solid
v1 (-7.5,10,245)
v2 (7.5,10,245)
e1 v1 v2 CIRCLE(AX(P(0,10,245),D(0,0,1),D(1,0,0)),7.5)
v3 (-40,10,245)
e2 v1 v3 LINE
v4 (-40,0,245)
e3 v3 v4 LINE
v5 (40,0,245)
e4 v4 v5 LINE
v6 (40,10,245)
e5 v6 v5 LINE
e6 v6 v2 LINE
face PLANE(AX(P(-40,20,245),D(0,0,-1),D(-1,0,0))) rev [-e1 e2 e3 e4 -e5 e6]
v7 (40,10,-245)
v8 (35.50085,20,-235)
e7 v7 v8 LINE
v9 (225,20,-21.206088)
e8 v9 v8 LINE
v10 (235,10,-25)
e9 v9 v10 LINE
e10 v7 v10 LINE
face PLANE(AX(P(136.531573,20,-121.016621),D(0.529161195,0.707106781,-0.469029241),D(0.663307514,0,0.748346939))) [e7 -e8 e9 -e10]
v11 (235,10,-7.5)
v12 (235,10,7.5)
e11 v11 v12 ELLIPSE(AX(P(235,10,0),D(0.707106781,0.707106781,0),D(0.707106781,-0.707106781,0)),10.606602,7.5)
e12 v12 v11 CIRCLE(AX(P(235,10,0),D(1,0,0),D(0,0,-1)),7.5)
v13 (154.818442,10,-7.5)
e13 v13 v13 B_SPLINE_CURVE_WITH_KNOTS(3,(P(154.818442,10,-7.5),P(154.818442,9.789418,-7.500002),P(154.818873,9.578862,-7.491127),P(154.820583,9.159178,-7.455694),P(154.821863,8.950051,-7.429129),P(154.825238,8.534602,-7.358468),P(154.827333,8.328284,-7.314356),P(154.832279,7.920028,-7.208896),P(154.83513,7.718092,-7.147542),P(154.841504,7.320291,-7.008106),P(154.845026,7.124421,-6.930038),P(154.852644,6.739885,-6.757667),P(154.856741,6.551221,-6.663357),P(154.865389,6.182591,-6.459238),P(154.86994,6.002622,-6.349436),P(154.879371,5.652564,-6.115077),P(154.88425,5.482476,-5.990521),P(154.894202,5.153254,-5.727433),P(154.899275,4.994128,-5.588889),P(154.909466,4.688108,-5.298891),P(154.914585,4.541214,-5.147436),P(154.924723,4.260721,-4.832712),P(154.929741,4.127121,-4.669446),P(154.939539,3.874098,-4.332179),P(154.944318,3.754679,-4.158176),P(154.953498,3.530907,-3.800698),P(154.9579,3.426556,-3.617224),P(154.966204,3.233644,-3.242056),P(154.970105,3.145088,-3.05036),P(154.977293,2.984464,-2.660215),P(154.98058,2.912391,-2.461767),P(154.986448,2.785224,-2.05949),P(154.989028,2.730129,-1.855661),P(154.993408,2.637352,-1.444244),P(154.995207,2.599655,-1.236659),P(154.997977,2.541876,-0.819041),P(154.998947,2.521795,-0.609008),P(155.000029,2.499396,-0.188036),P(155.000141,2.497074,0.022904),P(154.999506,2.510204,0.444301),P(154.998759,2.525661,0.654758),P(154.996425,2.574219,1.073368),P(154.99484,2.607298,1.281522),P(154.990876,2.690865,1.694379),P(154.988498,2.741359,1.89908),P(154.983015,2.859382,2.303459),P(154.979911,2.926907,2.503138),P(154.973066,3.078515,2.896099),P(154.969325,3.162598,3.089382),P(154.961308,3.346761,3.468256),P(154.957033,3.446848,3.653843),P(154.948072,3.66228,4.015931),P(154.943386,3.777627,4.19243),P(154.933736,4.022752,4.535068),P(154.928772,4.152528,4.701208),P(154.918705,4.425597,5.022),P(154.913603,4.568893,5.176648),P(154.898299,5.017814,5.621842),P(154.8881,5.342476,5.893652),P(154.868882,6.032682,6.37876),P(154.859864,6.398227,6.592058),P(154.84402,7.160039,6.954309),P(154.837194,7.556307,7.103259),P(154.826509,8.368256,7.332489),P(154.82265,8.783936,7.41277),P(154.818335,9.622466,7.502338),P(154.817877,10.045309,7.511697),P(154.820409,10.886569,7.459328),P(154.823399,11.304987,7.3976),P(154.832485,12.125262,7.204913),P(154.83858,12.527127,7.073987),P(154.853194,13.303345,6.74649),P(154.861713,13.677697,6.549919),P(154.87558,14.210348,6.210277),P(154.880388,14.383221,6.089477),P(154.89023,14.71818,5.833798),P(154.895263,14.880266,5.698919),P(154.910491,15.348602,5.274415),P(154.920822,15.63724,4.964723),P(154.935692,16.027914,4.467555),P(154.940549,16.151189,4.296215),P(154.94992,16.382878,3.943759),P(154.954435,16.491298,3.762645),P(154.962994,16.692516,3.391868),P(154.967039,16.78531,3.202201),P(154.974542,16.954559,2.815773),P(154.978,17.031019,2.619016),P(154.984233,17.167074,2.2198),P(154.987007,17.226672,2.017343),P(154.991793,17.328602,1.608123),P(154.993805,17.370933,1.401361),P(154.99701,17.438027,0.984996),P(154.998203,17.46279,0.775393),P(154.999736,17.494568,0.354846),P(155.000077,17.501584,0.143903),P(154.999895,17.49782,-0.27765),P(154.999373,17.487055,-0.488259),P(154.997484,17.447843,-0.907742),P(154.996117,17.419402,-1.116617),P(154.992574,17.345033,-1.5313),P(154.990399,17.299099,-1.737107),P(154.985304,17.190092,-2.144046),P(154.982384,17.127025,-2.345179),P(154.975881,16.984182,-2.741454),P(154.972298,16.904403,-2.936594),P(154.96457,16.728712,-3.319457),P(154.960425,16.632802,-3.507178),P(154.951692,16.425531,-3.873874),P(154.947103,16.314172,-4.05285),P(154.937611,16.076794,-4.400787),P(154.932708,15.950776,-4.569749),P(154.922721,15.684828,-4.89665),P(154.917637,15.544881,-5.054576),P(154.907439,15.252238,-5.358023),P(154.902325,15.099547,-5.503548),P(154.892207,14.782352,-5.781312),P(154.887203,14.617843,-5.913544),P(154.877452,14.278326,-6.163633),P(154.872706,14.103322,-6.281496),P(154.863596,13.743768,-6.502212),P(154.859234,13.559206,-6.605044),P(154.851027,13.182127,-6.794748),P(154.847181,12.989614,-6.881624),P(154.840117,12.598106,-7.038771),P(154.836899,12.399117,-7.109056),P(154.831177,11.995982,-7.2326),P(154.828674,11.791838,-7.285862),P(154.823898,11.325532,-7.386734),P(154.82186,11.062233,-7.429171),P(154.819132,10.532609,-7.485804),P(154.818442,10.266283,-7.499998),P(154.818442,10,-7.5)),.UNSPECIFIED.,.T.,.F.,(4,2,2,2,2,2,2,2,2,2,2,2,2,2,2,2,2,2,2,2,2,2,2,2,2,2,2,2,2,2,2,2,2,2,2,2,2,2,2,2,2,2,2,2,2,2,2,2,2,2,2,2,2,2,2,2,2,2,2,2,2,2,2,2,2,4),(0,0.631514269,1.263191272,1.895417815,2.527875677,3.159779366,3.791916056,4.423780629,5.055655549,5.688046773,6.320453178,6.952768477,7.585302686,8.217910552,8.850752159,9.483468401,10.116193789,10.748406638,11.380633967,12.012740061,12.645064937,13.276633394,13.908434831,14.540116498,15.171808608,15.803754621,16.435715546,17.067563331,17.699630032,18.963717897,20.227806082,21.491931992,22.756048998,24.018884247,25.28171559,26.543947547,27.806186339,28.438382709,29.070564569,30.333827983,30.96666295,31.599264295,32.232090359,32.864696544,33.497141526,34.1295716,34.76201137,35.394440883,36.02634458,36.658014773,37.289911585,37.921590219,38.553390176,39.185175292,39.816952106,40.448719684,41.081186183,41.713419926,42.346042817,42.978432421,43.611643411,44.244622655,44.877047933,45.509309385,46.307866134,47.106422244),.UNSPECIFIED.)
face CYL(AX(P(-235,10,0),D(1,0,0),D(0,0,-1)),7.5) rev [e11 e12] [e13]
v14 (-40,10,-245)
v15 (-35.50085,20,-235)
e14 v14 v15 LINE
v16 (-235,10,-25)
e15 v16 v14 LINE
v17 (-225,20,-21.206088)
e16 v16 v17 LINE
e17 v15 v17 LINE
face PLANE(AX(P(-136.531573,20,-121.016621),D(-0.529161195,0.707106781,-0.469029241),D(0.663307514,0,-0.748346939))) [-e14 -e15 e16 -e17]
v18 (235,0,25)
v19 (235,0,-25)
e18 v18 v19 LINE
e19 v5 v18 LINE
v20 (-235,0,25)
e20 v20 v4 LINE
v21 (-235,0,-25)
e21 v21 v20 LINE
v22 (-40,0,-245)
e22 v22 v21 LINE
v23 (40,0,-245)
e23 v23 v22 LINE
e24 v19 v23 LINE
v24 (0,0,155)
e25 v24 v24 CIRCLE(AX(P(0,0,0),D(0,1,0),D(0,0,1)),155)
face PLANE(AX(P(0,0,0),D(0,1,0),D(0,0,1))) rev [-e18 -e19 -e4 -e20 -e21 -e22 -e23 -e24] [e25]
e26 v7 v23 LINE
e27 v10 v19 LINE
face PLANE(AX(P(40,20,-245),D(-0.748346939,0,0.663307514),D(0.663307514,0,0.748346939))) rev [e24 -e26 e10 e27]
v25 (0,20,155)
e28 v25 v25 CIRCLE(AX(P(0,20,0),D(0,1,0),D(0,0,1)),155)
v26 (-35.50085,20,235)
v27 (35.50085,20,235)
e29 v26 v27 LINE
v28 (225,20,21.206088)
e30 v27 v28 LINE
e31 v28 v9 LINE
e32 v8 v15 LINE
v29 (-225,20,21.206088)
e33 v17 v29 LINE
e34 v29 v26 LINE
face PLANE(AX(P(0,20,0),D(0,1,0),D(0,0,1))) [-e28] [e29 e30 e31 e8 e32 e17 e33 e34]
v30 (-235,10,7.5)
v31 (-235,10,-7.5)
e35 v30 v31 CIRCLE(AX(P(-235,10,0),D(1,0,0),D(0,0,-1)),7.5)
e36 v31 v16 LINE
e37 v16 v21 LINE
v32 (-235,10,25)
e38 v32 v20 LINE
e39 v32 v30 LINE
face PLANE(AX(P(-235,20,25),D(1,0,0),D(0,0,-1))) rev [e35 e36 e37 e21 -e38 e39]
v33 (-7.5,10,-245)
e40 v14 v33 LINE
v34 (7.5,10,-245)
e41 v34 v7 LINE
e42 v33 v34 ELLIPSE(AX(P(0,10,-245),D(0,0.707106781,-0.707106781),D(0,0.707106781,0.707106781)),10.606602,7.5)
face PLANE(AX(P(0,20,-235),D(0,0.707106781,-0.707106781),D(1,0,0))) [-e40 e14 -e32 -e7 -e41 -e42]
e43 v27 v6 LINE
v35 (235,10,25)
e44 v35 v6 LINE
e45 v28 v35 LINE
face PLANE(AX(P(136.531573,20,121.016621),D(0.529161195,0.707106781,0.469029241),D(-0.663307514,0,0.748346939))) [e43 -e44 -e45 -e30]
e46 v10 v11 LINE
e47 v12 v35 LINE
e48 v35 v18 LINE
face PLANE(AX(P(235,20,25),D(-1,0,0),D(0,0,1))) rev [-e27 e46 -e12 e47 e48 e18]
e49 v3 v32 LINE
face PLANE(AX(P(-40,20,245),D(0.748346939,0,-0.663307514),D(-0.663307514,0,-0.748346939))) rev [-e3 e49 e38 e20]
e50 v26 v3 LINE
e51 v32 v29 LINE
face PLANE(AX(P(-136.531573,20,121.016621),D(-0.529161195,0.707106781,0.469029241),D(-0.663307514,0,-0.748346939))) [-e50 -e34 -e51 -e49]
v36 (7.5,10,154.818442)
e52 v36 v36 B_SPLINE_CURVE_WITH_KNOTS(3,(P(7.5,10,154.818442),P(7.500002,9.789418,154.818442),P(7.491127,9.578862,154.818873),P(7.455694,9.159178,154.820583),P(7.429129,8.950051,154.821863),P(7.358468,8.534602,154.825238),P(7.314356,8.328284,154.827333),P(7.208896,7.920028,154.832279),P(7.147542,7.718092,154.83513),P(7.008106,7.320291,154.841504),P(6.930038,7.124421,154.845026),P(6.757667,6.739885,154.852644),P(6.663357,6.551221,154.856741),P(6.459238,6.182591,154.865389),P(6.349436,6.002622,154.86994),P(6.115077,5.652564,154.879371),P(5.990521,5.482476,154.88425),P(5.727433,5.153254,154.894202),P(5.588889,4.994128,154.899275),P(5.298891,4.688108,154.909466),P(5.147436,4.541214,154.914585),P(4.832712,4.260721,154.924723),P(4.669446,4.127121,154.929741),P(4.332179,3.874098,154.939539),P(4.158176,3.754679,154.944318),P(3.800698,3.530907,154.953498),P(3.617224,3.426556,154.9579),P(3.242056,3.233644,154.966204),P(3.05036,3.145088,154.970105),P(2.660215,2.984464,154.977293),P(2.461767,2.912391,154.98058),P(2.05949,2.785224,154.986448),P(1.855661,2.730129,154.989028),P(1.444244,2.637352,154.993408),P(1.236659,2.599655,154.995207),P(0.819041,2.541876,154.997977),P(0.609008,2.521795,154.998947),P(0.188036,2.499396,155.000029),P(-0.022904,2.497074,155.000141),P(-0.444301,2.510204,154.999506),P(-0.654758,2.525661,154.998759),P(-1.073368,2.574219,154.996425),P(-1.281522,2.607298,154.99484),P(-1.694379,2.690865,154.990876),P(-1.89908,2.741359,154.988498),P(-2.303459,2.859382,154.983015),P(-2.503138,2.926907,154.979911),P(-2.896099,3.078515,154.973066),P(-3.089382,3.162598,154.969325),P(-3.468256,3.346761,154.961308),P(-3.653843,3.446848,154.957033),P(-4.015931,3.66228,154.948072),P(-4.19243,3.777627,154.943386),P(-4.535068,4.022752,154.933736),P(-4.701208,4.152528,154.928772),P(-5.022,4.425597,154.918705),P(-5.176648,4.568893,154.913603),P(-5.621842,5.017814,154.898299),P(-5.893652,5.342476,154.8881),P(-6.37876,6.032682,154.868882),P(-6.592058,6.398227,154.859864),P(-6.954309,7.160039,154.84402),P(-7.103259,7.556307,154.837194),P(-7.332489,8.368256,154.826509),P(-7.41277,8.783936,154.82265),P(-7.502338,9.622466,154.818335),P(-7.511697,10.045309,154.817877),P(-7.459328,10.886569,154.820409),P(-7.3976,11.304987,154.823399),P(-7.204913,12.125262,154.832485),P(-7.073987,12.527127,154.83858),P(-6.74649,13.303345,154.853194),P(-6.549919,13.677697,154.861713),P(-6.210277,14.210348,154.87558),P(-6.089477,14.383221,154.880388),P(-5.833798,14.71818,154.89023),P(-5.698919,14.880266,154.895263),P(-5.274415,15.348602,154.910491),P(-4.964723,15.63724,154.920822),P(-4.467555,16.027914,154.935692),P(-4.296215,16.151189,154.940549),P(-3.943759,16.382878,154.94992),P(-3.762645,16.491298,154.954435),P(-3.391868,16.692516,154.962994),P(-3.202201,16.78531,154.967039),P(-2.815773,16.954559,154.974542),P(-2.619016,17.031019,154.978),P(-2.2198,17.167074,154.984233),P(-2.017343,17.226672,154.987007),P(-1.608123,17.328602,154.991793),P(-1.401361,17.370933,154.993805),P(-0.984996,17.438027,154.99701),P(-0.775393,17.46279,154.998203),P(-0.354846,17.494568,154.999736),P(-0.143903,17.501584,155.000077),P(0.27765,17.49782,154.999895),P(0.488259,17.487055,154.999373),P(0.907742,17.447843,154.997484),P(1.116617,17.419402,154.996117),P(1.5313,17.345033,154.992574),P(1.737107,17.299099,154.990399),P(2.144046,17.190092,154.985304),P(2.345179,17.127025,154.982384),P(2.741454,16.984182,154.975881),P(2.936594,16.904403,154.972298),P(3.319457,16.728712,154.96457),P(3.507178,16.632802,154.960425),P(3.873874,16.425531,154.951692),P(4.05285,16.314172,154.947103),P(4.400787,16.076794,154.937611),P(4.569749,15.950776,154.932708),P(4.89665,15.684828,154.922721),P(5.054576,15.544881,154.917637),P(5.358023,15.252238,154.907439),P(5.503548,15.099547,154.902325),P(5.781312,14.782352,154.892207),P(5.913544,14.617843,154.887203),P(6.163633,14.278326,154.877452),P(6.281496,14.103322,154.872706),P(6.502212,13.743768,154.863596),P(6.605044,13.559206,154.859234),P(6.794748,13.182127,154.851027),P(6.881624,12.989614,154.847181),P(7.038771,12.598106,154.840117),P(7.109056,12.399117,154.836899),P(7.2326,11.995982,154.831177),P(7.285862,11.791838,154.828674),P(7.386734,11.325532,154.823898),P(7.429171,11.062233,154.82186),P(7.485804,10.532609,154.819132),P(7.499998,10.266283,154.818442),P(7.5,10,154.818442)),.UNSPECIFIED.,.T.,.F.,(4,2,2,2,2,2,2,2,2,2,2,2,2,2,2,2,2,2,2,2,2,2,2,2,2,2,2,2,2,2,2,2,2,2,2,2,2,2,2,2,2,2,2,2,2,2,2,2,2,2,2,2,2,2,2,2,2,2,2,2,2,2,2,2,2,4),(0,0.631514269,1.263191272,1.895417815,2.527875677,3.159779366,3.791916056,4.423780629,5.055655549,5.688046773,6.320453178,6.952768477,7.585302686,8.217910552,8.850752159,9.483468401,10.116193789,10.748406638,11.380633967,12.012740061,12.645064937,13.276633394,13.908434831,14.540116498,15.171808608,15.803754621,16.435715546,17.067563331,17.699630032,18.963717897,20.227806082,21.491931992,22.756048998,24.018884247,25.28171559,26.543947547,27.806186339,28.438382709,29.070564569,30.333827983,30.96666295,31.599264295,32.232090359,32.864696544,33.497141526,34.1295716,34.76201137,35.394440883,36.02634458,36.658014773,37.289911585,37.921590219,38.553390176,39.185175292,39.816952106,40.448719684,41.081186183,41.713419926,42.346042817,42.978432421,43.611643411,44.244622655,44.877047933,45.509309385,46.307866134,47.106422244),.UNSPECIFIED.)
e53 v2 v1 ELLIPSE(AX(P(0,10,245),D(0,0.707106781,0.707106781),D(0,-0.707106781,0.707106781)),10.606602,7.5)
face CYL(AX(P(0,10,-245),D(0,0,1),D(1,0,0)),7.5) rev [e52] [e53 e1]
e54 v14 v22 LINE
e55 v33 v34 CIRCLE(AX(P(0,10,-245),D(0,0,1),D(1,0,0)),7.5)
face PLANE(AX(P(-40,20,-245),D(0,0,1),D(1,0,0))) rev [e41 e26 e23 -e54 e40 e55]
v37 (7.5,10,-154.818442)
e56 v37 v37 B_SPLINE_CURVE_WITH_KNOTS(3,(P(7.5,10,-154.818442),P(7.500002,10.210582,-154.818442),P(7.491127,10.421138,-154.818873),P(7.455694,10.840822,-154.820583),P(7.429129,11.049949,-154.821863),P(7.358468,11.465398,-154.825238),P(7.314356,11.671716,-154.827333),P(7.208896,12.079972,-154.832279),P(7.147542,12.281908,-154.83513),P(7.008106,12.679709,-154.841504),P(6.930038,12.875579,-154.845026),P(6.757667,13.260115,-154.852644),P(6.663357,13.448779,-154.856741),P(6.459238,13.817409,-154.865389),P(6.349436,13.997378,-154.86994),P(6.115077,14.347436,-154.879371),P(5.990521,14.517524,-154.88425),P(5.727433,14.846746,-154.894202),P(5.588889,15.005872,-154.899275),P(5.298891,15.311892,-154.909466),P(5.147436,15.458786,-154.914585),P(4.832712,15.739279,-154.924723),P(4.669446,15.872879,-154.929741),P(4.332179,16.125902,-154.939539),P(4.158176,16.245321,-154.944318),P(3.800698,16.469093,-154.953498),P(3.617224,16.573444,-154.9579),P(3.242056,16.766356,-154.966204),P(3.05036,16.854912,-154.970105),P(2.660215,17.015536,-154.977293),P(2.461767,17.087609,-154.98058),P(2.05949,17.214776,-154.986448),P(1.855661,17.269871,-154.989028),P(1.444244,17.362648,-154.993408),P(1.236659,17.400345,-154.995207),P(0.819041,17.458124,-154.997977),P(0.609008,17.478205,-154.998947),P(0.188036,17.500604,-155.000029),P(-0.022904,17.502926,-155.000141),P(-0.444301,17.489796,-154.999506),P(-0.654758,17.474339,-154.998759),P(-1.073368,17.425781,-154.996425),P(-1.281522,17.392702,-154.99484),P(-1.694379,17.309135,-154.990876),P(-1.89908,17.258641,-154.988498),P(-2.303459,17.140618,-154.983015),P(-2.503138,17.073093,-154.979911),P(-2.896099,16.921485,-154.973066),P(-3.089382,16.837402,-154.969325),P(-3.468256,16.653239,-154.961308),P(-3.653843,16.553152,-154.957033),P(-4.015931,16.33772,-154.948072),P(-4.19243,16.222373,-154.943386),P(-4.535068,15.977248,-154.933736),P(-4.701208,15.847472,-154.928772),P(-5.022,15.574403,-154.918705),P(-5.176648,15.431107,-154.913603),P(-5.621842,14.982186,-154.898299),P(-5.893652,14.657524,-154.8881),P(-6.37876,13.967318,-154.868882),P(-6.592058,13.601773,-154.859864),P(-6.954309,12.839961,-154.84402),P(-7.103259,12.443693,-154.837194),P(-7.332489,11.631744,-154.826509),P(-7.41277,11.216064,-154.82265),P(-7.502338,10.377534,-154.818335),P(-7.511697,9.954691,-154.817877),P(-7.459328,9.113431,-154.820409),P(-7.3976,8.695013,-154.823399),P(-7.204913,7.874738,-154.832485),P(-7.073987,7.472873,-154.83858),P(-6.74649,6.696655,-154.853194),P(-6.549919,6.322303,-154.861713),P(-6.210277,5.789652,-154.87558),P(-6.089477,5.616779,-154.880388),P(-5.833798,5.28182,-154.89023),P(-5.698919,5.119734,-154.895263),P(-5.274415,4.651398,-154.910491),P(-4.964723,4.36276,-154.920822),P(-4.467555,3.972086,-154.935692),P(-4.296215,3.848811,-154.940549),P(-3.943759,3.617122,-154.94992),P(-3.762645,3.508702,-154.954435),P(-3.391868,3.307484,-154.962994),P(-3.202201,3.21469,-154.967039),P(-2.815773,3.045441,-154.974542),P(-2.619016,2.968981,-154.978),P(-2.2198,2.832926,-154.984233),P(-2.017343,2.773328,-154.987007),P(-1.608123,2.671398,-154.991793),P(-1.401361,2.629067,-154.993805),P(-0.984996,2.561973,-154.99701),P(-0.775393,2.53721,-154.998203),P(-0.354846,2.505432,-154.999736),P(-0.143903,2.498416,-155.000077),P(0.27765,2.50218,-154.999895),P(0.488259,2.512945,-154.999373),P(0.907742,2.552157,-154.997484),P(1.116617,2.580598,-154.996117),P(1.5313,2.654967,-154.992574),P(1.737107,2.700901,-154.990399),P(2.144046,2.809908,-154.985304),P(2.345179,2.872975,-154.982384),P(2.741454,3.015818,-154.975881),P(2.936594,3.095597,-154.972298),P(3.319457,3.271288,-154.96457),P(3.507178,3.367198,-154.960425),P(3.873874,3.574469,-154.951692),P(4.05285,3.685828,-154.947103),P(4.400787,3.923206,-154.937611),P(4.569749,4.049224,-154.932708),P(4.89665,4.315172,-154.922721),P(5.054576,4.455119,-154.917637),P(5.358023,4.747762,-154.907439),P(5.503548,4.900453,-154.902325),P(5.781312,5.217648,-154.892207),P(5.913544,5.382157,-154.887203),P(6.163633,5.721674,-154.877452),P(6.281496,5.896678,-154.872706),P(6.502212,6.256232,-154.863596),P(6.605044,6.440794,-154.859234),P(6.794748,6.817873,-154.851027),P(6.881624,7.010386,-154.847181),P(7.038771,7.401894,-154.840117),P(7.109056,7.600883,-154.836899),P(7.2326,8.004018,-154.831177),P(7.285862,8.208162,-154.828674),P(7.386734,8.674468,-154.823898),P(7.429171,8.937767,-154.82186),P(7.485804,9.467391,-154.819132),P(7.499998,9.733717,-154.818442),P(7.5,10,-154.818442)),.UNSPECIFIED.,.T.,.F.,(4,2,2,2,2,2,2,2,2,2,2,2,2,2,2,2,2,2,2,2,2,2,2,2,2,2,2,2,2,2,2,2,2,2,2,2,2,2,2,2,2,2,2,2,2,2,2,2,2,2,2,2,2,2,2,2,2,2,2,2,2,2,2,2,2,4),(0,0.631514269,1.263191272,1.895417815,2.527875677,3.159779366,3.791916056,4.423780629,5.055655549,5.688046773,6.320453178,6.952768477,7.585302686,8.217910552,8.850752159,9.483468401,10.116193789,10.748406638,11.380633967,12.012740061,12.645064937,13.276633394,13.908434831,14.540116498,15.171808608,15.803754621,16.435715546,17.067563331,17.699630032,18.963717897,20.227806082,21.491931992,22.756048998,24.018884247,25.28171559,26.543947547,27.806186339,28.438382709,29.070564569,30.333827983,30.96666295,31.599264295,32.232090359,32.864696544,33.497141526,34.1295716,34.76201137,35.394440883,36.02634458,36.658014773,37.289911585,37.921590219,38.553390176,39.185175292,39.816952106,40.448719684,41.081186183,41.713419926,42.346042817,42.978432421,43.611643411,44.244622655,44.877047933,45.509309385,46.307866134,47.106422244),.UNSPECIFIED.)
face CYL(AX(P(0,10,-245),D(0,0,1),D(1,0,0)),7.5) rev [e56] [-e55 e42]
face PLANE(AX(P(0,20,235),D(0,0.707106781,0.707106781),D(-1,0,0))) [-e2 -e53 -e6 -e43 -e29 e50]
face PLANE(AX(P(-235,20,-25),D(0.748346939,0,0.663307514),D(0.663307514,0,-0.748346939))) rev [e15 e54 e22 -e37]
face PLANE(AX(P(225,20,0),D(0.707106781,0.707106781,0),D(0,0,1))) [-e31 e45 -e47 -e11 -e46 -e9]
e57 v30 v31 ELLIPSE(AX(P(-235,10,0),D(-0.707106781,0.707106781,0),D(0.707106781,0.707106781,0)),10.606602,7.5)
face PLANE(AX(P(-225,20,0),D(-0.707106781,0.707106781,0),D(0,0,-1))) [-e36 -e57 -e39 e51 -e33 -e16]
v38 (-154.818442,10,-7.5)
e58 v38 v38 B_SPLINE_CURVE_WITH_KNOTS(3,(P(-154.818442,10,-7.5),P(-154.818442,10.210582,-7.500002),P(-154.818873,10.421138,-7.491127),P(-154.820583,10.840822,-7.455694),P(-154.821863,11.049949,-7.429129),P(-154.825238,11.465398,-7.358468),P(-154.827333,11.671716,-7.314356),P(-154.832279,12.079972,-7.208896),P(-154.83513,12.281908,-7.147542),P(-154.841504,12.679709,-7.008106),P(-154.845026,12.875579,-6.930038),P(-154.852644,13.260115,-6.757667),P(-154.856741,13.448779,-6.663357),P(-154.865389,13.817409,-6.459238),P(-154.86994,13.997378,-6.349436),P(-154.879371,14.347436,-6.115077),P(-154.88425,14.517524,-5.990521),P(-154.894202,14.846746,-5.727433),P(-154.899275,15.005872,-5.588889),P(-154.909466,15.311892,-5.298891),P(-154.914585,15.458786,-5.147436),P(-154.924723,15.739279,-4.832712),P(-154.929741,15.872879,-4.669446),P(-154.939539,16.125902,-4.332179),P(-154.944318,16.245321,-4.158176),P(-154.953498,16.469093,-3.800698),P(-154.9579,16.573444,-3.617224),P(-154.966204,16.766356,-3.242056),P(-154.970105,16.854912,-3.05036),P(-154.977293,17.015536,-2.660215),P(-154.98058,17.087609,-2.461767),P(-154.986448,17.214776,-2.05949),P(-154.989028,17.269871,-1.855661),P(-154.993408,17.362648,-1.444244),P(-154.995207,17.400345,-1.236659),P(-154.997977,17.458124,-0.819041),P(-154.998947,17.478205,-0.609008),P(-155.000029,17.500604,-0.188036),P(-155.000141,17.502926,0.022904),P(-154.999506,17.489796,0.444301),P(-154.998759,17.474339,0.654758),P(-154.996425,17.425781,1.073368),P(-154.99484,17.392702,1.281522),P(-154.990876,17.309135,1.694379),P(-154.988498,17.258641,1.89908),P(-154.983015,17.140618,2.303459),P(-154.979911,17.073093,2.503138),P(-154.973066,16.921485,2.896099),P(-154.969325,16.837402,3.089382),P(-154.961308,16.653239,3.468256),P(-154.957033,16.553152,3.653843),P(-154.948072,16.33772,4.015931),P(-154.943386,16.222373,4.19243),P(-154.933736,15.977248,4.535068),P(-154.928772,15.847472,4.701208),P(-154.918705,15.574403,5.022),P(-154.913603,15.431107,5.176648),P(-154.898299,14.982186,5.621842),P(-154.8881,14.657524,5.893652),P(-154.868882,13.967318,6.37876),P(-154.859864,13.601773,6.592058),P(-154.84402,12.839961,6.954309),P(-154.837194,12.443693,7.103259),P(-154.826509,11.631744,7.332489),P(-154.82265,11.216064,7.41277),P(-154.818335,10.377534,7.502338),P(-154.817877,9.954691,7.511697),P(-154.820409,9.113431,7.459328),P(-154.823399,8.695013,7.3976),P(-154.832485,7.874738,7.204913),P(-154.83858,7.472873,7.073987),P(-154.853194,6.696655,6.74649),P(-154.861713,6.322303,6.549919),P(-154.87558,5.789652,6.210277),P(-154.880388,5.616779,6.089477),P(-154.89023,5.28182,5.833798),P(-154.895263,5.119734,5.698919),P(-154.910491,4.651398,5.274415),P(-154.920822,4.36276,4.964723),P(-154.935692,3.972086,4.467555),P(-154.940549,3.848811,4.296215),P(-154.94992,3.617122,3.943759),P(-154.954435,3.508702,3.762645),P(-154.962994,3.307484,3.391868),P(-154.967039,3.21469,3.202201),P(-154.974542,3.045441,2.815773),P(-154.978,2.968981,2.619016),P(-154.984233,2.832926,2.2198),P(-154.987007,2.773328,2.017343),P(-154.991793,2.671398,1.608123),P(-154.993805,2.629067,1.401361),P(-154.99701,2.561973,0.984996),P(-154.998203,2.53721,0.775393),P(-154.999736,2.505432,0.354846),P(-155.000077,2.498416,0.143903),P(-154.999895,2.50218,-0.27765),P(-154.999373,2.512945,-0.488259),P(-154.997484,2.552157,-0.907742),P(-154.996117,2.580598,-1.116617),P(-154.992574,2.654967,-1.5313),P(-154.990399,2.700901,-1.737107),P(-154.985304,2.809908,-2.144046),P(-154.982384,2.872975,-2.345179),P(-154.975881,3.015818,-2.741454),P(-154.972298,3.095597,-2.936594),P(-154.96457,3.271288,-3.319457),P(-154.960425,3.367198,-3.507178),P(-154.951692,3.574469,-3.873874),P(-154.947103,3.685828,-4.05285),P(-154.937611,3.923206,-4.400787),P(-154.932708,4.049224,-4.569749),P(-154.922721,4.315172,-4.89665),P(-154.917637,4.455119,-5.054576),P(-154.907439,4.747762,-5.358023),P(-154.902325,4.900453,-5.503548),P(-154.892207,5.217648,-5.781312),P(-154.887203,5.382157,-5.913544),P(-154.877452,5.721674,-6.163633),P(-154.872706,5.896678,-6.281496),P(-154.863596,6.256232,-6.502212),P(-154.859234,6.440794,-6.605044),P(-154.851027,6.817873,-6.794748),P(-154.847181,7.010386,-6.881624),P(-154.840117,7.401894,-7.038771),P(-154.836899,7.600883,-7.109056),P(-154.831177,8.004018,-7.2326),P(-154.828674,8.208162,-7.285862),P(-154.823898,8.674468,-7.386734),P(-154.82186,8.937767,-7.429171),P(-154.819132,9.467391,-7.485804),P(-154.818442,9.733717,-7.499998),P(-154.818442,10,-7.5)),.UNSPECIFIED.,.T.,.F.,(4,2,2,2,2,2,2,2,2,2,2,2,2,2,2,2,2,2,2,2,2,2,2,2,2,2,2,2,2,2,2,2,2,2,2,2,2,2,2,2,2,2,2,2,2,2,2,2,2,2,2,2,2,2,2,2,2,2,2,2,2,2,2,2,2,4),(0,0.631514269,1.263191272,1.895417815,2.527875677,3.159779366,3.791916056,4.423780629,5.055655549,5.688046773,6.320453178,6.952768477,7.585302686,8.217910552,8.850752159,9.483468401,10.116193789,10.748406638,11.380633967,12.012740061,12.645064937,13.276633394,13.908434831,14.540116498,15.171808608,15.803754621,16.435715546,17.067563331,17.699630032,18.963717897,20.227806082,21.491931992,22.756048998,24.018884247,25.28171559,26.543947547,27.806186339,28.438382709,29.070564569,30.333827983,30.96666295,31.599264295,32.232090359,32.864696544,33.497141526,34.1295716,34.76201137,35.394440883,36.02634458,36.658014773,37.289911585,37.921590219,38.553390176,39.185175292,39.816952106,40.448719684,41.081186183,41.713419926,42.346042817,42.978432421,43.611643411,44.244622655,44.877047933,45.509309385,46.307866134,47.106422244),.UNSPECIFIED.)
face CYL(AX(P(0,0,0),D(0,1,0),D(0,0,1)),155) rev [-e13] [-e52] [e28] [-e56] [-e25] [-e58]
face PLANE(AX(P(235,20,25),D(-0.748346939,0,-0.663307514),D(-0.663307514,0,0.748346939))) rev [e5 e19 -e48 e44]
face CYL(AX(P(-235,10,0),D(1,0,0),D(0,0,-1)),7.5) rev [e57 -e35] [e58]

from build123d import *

# Parameters (mm, degrees)
BOSS_EXTRUDE1_DEPTH = 20
SKETCH2_R           = 7.5
CUT_EXTRUDE1_DEPTH  = 544.806031596
SKETCH3_R           = 7.5
CUT_EXTRUDE2_DEPTH  = 531.400791855
CHAMFER1_SIZE       = 10
SKETCH4_R           = 155
CUT_EXTRUDE3_DEPTH  = 341.073521463


with BuildPart() as part:
    # Sketch1 → Boss-Extrude1 (new body)
    with BuildSketch(Plane(origin=(0, 0, 0), x_dir=(1, 0, 0), z_dir=(0, 1, 0))):
        Polygon((-235, 25), (-40, 245), (40, 245), (235, 25), (235, -25), (40, -245), (-40, -245), (-235, -25), align=None)
    extrude(amount=BOSS_EXTRUDE1_DEPTH)

    # Sketch2 → Cut-Extrude1 (cut, through all)
    with BuildSketch(Plane.XY.offset(245)):
        with Locations((0, 10)):
            Circle(SKETCH2_R)
    extrude(amount=-CUT_EXTRUDE1_DEPTH, mode=Mode.SUBTRACT)

    # Sketch3 → Cut-Extrude2 (cut, through all)
    with BuildSketch(Plane(origin=(235, 0, 0), x_dir=(0, 0, -1), z_dir=(1, 0, 0))):
        with Locations((0, 10)):
            Circle(SKETCH3_R)
    extrude(amount=-CUT_EXTRUDE2_DEPTH, mode=Mode.SUBTRACT)

    # Chamfer1
    # the kernel refuses this chamfer: 10 mm, written as the material it takes off along each edge
    with BuildSketch(Plane(origin=(-235, 20, 50.71682988), x_dir=(-0.0274958766105877, -0.9996219169112968, 0), z_dir=(0, 0, -1))) as chamfer1_piece_1:
        Polygon((CHAMFER1_SIZE * 0.999621916911, -CHAMFER1_SIZE * 0.0274958766106), (-CHAMFER1_SIZE * 0.0274958766106, -CHAMFER1_SIZE * 0.999621916911), (0, 0), align=None)
    extrude(amount=101.433659759, mode=Mode.SUBTRACT)
    with BuildSketch(Plane(origin=(-22.941833496, 20, 264.245110927), x_dir=(0.7480640019059354, 0.02749587661058627, -0.6630567289620791), z_dir=(-0.6633075143158518, 0, -0.7483469392281404)), Plane(origin=(252.058166504, 20, 5.754889073), x_dir=(-0.7480640019059355, 0.02749587661058636, -0.6630567289620791), z_dir=(-0.6633075143158518, 0, 0.7483469392281404)), Plane(origin=(22.941833496, 20, -264.245110927), x_dir=(-0.7480640019059354, 0.02749587661058627, 0.6630567289620791), z_dir=(0.6633075143158519, 0, 0.7483469392281404))) as chamfer1_piece_2:
        Polygon((CHAMFER1_SIZE * 0.999621916911, CHAMFER1_SIZE * 0.0274958766106), (-CHAMFER1_SIZE * 0.0274958766106, CHAMFER1_SIZE * 0.999621916911), (0, 0), align=None)
    extrude(amount=345.414951681, mode=Mode.SUBTRACT)
    with BuildSketch(Plane(origin=(65.71682988, 20, 245), x_dir=(0, 0.027495876610586282, -0.9996219169112968), z_dir=(-1, 0, 0))) as chamfer1_piece_3:
        Polygon((CHAMFER1_SIZE * 0.999621916911, CHAMFER1_SIZE * 0.0274958766106), (-CHAMFER1_SIZE * 0.0274958766106, CHAMFER1_SIZE * 0.999621916911), (0, 0), align=None)
    extrude(amount=131.433659759, mode=Mode.SUBTRACT)
    with BuildSketch(Plane(origin=(235, 20, -50.71682988), x_dir=(-0.9996219169112968, 0.027495876610586282, 0), z_dir=(0, 0, 1))) as chamfer1_piece_4:
        Polygon((CHAMFER1_SIZE * 0.999621916911, CHAMFER1_SIZE * 0.0274958766106), (-CHAMFER1_SIZE * 0.0274958766106, CHAMFER1_SIZE * 0.999621916911), (0, 0), align=None)
    extrude(amount=101.433659759, mode=Mode.SUBTRACT)
    with BuildSketch(Plane(origin=(-65.71682988, 20, -245), x_dir=(0, -0.9996219169112968, -0.0274958766105877), z_dir=(1, 0, 0))) as chamfer1_piece_5:
        Polygon((CHAMFER1_SIZE * 0.999621916911, -CHAMFER1_SIZE * 0.0274958766106), (-CHAMFER1_SIZE * 0.0274958766106, -CHAMFER1_SIZE * 0.999621916911), (0, 0), align=None)
    extrude(amount=131.433659759, mode=Mode.SUBTRACT)
    with BuildSketch(Plane(origin=(-252.058166504, 20, -5.754889073), x_dir=(-0.020576455102926446, -0.9996219169112968, -0.018238221568502983), z_dir=(0.6633075143158518, 0, -0.7483469392281404))) as chamfer1_piece_6:
        Polygon((CHAMFER1_SIZE * 0.999621916911, -CHAMFER1_SIZE * 0.0274958766106), (-CHAMFER1_SIZE * 0.0274958766106, -CHAMFER1_SIZE * 0.999621916911), (0, 0), align=None)
    extrude(amount=345.414951681, mode=Mode.SUBTRACT)

    # Sketch4 → Cut-Extrude3 (cut, through all)
    with BuildSketch(Plane(origin=(0, 20, 0), x_dir=(1, 0, 0), z_dir=(0, 1, 0))):
        with Locations(Location((0, 0, 0), (0, 0, 270))):
            Circle(SKETCH4_R)
    extrude(amount=-CUT_EXTRUDE3_DEPTH, mode=Mode.SUBTRACT)


solid = part.part
